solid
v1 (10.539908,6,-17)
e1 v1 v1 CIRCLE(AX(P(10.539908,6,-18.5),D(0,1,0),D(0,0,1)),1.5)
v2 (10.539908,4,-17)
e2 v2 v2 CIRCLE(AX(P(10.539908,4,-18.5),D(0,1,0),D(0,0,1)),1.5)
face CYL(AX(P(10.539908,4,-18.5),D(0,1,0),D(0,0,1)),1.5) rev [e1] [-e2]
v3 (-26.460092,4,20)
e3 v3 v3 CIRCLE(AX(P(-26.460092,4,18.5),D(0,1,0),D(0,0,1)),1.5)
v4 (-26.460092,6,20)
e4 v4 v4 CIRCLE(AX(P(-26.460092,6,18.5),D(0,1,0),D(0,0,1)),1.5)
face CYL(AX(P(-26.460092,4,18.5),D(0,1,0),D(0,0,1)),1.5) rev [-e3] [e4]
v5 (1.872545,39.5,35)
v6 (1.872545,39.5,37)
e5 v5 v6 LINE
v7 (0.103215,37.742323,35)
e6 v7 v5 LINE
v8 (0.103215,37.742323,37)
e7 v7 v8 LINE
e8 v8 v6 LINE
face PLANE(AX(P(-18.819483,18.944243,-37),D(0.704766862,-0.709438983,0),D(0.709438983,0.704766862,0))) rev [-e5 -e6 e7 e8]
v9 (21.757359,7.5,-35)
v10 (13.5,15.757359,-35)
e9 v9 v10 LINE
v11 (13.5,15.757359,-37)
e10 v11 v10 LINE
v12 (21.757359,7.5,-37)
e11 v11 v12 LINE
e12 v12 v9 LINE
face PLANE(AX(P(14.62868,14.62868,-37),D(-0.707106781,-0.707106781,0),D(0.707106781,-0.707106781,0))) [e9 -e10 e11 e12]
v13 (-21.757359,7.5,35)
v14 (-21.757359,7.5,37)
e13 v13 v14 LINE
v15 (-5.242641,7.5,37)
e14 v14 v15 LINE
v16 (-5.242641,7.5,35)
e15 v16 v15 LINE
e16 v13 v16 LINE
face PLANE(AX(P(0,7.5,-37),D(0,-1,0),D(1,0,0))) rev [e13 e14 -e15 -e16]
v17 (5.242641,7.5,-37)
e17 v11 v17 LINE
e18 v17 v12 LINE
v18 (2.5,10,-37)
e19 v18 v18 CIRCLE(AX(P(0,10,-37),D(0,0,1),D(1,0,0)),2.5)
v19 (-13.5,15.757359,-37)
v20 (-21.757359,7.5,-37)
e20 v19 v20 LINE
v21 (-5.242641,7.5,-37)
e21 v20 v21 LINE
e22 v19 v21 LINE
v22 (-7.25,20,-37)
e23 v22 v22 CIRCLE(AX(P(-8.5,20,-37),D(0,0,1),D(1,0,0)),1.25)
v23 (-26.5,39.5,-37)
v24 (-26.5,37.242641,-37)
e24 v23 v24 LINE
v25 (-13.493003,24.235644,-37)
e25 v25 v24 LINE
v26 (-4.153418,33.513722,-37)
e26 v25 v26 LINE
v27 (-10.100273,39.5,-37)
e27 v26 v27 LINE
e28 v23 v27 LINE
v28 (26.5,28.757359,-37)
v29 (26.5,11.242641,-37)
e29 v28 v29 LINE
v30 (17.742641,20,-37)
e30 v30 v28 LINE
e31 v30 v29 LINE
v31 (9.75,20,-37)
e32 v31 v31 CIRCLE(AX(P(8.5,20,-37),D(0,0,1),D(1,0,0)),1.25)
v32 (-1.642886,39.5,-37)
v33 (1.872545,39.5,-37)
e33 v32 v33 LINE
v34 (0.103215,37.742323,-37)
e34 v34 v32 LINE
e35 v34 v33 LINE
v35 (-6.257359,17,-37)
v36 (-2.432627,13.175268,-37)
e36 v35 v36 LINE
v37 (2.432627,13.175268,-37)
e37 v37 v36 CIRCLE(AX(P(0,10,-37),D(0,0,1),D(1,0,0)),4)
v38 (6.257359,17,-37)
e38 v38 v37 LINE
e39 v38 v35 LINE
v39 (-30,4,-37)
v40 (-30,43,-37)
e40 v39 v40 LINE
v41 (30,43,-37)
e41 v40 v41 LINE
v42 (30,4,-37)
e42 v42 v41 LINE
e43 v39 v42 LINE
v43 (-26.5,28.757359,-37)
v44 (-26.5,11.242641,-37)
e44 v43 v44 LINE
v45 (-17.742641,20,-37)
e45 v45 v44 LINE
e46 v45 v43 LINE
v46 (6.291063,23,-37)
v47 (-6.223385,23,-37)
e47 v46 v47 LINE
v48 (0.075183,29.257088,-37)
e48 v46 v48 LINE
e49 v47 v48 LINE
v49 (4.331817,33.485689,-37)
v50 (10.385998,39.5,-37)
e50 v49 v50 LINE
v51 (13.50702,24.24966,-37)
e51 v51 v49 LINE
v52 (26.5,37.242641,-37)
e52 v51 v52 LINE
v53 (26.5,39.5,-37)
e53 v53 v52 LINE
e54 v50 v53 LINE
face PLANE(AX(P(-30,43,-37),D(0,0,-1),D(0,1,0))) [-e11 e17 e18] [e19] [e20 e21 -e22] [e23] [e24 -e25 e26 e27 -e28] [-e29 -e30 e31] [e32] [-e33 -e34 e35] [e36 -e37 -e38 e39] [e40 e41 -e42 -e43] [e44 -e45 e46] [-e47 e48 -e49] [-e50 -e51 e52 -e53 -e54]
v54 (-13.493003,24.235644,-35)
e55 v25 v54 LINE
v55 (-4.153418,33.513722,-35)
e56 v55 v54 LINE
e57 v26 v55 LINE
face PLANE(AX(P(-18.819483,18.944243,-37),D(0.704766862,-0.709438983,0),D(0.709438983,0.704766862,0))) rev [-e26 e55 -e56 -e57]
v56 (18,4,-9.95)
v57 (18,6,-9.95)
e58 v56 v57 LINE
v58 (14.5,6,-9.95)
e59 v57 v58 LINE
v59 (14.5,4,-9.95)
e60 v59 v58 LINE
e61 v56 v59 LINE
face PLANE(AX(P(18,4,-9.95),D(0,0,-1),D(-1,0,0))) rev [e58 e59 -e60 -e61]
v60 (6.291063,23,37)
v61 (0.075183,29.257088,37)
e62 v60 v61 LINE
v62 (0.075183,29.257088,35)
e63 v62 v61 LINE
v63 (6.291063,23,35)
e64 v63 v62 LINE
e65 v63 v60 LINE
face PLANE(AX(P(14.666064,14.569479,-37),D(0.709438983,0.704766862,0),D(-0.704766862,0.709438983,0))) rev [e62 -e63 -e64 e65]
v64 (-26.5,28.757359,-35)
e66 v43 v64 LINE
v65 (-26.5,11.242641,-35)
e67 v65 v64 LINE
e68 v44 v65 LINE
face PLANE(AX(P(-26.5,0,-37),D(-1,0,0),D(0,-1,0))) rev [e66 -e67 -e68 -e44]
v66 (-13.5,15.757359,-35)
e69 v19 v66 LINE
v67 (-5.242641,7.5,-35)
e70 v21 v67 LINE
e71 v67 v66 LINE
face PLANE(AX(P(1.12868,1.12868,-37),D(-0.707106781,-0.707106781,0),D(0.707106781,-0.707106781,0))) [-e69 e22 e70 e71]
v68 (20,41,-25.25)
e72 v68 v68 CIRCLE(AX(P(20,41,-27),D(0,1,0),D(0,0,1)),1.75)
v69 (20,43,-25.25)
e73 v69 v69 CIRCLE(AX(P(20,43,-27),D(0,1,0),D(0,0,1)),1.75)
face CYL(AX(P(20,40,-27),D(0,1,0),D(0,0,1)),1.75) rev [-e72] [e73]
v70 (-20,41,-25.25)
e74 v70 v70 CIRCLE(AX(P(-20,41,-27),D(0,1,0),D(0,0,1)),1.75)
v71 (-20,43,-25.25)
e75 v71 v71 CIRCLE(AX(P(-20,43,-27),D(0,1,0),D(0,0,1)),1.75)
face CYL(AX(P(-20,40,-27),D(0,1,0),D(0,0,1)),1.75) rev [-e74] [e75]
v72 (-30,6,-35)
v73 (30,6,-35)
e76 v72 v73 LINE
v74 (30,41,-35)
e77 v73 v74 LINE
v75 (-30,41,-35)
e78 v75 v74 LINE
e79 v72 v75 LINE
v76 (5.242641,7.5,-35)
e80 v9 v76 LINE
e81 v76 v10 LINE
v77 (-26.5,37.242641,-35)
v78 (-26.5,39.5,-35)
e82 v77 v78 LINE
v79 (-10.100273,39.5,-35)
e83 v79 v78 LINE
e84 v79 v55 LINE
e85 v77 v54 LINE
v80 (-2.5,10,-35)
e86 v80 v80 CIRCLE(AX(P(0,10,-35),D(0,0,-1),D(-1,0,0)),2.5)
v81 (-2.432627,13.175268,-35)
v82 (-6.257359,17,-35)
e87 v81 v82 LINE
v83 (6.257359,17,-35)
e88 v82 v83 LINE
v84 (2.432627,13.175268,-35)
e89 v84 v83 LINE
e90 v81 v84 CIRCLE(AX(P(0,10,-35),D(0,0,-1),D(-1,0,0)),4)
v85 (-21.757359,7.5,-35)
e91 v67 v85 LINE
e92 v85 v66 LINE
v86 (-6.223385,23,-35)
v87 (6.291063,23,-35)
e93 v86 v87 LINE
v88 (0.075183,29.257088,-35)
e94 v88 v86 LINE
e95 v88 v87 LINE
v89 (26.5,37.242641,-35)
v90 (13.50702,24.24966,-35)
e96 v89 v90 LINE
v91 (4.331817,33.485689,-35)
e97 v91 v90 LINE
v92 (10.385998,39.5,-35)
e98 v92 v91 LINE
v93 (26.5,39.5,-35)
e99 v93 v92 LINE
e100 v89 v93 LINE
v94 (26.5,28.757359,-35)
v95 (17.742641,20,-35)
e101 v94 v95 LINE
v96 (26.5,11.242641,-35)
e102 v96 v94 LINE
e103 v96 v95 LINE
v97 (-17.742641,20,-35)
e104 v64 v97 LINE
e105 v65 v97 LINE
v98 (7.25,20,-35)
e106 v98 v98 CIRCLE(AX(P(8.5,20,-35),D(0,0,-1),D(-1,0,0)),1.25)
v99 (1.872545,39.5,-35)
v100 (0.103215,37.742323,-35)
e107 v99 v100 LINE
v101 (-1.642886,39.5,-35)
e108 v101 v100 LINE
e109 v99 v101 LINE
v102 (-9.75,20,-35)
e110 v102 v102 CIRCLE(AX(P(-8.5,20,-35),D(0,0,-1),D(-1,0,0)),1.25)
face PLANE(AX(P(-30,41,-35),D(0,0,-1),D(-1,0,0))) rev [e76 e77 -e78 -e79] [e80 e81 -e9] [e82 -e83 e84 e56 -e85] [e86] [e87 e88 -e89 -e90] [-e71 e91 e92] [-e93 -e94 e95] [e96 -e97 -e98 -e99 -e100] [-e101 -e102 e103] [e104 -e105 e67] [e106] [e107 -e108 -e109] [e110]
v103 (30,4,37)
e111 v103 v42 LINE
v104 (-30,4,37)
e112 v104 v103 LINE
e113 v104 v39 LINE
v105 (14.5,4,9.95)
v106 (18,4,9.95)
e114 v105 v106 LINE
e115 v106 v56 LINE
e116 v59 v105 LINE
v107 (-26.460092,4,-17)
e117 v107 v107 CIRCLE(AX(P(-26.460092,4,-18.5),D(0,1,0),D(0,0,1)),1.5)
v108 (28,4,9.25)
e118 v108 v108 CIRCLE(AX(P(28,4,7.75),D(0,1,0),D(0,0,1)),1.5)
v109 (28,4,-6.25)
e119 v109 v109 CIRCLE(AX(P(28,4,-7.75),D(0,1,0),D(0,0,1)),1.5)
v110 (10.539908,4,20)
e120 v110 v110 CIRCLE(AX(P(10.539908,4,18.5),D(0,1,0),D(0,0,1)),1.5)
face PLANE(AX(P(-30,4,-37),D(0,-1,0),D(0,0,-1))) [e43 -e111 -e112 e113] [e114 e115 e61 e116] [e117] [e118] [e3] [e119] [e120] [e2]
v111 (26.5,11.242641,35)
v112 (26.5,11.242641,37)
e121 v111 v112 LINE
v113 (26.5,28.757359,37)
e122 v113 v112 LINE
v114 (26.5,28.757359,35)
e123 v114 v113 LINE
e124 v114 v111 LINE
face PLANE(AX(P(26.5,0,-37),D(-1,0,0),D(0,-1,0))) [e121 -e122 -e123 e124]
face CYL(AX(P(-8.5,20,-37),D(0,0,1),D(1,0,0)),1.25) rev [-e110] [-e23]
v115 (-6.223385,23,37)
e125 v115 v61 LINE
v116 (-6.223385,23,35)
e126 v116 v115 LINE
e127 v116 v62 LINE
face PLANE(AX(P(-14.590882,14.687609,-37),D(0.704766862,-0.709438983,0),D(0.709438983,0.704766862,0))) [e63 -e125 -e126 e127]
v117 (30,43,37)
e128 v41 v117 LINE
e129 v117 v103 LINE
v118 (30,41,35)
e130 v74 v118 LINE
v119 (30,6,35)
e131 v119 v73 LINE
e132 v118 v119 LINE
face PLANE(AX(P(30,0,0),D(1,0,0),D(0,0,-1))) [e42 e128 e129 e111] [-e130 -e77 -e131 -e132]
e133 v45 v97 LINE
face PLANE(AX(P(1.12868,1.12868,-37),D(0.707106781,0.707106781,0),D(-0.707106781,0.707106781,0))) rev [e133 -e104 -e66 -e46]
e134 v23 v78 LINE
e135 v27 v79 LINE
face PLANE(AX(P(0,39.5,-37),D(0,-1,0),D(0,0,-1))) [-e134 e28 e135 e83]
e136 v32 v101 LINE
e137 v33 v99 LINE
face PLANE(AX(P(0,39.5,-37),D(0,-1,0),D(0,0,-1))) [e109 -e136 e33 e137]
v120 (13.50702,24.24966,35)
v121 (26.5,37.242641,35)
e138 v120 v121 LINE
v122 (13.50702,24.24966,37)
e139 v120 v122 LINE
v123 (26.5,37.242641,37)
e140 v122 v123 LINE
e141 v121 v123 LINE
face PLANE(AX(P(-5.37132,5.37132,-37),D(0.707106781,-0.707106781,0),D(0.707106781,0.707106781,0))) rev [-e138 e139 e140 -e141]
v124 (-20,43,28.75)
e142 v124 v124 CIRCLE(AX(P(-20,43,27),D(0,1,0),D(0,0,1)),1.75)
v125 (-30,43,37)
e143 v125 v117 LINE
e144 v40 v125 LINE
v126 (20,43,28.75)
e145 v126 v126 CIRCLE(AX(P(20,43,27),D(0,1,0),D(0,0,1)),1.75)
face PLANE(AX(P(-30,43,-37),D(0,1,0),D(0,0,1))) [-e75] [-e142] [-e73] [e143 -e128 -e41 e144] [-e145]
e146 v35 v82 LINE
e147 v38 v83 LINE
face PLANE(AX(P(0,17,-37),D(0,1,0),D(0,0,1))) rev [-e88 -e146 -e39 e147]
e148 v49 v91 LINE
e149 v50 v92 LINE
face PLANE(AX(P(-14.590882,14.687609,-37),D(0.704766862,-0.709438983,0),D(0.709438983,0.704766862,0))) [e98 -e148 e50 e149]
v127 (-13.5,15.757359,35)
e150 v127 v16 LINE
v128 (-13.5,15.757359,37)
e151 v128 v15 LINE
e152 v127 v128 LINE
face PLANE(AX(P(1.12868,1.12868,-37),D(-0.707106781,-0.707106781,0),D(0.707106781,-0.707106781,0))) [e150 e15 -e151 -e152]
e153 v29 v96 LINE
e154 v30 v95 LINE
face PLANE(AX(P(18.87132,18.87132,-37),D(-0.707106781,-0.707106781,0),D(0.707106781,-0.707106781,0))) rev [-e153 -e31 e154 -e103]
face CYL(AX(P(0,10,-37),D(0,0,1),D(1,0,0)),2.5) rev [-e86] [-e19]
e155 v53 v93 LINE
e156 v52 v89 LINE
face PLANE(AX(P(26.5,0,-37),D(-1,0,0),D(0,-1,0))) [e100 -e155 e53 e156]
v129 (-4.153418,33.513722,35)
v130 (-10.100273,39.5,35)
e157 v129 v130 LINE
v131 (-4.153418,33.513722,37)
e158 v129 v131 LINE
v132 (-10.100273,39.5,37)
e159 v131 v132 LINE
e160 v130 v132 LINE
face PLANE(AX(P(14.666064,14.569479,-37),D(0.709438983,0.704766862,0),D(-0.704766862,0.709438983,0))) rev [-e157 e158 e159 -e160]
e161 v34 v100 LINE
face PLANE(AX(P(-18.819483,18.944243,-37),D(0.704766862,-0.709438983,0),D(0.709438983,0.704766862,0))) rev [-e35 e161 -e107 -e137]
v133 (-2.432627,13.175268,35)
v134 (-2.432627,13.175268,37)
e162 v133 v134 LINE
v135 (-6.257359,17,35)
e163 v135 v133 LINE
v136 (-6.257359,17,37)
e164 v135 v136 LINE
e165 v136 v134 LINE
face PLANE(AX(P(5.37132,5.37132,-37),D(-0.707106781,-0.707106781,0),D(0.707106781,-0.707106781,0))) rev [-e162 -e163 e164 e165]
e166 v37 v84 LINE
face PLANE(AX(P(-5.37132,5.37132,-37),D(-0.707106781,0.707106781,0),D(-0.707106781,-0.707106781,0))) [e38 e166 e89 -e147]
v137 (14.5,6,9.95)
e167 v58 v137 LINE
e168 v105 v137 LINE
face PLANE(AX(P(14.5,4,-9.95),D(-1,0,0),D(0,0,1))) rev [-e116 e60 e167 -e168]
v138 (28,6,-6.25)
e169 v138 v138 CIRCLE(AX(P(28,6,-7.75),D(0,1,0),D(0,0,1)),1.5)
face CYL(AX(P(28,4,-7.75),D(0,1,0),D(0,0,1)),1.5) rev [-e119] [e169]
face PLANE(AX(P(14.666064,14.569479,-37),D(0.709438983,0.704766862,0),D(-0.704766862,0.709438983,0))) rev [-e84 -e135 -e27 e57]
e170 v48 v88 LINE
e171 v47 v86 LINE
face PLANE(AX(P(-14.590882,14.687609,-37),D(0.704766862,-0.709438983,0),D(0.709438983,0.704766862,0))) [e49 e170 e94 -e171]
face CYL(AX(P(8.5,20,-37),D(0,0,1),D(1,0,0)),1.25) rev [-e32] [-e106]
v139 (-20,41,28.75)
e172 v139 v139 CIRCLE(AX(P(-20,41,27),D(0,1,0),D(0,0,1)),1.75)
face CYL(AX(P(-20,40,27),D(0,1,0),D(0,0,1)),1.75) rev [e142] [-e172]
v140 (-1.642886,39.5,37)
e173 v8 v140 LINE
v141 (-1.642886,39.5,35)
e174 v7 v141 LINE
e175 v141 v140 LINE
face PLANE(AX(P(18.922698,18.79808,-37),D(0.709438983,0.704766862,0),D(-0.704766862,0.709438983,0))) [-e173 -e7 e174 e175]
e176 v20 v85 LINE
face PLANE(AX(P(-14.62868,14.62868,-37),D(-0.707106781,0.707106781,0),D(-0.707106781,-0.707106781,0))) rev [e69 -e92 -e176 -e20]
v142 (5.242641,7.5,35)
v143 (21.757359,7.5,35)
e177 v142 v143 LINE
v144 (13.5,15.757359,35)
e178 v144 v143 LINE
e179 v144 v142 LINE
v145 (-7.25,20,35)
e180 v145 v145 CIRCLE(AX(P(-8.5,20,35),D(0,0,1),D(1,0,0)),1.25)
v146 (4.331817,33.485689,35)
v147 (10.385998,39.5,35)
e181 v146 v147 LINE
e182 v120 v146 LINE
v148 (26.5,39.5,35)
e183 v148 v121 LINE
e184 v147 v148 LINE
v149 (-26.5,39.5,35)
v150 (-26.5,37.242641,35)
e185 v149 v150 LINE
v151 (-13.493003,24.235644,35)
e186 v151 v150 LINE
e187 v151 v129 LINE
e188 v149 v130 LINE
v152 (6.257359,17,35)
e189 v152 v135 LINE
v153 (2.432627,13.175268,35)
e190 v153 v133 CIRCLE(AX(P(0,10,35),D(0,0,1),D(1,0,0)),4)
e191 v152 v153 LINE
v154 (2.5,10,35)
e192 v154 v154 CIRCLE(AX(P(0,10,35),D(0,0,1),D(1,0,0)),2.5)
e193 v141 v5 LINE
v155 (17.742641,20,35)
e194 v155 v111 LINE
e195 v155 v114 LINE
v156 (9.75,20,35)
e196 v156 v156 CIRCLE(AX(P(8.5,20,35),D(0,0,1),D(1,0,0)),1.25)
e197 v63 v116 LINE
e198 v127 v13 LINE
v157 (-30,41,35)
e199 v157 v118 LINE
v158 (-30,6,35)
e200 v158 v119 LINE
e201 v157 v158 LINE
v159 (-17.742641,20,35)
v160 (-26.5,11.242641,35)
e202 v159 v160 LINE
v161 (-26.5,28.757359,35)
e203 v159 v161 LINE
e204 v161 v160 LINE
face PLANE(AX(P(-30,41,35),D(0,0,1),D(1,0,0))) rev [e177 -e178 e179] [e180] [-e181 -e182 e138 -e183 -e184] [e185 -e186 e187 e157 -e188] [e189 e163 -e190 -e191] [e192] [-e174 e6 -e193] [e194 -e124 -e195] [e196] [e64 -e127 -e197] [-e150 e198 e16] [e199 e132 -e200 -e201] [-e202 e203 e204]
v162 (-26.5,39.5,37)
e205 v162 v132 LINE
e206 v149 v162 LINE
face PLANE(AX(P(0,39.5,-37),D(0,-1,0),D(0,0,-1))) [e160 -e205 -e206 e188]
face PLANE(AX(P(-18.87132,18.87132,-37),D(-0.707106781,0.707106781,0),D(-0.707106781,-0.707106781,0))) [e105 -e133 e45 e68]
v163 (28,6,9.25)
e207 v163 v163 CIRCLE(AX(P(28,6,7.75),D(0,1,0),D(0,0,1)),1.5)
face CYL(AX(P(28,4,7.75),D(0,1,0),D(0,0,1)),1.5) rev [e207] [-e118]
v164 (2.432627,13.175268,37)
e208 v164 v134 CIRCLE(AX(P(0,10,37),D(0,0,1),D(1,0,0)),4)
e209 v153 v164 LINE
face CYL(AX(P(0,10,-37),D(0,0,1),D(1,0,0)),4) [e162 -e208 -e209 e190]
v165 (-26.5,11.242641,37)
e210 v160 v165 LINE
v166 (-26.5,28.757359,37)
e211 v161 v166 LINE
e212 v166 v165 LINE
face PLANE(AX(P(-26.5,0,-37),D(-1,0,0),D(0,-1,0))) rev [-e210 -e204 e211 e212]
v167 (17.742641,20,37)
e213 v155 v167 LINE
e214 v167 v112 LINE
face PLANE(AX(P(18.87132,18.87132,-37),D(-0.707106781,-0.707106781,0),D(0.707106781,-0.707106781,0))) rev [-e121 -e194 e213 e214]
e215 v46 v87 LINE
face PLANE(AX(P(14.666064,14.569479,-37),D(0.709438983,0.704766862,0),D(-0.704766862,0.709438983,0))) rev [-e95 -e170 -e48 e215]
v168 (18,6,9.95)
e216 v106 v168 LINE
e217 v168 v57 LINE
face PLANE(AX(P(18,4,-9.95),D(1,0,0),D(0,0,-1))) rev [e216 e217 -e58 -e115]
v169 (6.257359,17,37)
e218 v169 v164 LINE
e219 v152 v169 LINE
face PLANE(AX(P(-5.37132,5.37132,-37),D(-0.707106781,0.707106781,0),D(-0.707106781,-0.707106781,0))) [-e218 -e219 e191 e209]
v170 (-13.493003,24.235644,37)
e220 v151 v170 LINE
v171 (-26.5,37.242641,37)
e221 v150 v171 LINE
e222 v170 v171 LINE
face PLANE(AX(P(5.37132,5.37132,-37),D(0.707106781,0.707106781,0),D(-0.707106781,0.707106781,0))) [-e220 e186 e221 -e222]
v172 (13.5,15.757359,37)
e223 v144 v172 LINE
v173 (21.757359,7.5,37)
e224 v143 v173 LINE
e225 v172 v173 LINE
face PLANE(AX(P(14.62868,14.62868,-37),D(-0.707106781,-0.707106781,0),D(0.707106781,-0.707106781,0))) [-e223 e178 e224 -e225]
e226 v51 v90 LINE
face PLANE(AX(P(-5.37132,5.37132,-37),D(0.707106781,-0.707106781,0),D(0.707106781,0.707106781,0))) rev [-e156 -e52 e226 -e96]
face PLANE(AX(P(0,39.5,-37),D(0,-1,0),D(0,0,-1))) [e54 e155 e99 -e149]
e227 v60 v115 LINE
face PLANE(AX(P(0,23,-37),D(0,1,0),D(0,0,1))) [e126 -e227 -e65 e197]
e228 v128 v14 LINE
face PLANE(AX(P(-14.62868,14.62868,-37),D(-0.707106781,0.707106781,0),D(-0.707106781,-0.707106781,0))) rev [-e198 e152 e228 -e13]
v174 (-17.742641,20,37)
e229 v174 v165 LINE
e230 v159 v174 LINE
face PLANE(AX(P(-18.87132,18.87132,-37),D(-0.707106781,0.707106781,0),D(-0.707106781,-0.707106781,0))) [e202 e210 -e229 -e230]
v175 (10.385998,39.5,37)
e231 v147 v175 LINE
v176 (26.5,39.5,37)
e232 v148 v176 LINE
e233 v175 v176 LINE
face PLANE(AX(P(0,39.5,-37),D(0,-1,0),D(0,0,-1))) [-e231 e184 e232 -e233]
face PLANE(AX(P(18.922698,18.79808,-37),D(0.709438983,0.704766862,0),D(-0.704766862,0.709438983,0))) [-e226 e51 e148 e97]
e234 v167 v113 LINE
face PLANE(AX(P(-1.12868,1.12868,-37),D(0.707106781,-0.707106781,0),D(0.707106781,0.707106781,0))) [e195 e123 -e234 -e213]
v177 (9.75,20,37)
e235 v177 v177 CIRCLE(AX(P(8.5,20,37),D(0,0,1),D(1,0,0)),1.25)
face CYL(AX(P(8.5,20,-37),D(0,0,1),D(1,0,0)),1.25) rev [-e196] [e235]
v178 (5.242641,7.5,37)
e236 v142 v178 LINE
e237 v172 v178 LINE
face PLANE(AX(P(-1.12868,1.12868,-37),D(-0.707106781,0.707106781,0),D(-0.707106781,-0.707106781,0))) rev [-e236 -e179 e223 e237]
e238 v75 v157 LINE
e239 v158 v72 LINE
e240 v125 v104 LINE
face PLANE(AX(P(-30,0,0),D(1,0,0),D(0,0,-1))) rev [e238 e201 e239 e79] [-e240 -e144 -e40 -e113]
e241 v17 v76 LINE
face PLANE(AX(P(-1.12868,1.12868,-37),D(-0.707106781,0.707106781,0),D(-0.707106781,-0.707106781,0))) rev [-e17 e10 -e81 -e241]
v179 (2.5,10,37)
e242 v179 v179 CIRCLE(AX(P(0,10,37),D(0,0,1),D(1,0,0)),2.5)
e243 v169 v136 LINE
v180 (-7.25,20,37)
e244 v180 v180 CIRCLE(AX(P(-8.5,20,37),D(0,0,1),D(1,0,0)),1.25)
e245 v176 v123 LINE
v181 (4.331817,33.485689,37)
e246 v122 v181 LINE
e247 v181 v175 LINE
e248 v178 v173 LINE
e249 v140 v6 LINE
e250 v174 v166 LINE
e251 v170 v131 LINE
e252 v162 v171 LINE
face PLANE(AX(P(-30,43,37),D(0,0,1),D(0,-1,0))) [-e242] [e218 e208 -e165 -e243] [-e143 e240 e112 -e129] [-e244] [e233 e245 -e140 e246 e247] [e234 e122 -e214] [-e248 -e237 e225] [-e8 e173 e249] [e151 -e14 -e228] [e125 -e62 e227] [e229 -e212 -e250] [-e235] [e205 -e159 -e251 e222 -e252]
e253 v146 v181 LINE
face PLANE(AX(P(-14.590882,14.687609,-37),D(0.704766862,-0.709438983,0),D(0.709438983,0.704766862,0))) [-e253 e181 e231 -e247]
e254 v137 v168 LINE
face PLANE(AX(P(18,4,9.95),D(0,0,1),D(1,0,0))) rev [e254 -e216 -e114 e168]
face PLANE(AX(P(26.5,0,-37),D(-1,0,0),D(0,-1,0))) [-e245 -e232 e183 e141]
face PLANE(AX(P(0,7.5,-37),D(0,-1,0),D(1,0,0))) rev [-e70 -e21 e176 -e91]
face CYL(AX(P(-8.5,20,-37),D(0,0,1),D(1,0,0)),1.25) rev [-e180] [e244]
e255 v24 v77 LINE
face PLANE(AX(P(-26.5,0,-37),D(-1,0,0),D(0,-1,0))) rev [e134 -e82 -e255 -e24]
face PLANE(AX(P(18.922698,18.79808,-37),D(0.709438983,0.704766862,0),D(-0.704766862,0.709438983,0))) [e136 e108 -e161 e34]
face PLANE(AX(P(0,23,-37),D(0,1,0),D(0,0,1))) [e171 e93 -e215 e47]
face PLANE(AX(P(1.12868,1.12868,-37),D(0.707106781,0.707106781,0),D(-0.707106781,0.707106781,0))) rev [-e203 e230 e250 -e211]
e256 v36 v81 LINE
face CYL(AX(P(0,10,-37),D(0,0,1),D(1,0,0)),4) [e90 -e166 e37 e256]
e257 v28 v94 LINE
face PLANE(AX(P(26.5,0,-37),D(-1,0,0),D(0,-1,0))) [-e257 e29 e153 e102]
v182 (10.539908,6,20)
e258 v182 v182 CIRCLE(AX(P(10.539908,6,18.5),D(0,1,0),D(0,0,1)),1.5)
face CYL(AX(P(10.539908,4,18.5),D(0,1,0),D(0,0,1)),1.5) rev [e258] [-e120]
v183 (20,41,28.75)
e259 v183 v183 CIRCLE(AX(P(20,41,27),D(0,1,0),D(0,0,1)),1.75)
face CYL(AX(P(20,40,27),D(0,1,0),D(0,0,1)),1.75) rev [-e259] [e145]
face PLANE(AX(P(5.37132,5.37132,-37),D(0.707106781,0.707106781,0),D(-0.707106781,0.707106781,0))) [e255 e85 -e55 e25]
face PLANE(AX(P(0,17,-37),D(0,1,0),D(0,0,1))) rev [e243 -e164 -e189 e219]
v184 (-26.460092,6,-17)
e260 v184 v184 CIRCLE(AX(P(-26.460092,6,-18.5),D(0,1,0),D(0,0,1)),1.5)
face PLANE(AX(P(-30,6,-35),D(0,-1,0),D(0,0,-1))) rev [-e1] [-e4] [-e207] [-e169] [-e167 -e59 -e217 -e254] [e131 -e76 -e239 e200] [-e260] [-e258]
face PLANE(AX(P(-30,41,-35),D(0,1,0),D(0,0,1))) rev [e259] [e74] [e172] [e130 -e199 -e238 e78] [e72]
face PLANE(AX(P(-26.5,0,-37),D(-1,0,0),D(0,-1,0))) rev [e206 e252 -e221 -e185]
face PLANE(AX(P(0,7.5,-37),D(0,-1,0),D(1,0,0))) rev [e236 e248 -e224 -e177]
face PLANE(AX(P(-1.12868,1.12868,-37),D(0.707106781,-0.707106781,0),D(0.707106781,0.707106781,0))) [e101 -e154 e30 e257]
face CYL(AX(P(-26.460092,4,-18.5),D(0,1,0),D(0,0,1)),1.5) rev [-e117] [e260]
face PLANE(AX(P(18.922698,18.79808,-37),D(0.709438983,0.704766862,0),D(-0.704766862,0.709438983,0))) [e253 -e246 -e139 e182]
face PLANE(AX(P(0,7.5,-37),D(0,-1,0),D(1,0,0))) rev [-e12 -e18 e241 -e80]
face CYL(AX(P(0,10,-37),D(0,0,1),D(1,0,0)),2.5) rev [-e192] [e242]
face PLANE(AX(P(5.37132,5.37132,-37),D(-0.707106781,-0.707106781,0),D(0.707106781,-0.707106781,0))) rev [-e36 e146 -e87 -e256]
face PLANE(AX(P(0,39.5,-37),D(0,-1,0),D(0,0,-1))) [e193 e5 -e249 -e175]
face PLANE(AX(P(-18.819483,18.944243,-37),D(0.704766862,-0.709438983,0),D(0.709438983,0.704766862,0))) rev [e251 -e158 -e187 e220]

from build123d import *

# Parameters (mm, degrees)
BOSS_EXTRUDE1_DEPTH      = 30
BOSS_EXTRUDE1_DEPTH_BACK = 30
SKETCH2_W                = 74
SKETCH2_H                = 39
SKETCH2_W_2              = 70
SKETCH2_H_2              = 35
CUT_EXTRUDE1_DEPTH       = 65.171644829
CUT_EXTRUDE1_DEPTH_BACK  = 65.171644829
SKETCH1_R                = 1.25
SKETCH1_R_2              = 2.5
CUT_EXTRUDE2_START       = -37
CUT_EXTRUDE2_DEPTH       = 74
SKETCH4_R                = 1.75
CUT_EXTRUDE3_DEPTH       = 3
SKETCH5_R                = 1.5
SKETCH5_W                = 3.5
SKETCH5_H                = 19.9
CUT_EXTRUDE4_DEPTH       = 61.3158354


# Read off the part's stored shape, not the designer's step: Cut-Extrude2
with BuildPart() as part:
    # Sketch2 → Boss-Extrude1 (new, two sides: drawn at the far end of the back side and taken through both)
    with BuildSketch(Plane(origin=(0, 0, 0), x_dir=(0, 0, -1), z_dir=(1, 0, 0)).offset(-BOSS_EXTRUDE1_DEPTH_BACK)):
        with Locations((0, 23.5)):
            Rectangle(SKETCH2_W, SKETCH2_H)
        with Locations((0, 23.5)):
            Rectangle(SKETCH2_W_2, SKETCH2_H_2, mode=Mode.SUBTRACT)
    extrude(amount=BOSS_EXTRUDE1_DEPTH + BOSS_EXTRUDE1_DEPTH_BACK)

    # Sketch1 → Cut-Extrude1 (cut, two sides: drawn at the far end of the back side and taken through both)
    with BuildSketch(Plane.XY.offset(-CUT_EXTRUDE1_DEPTH_BACK)):
        with Locations((8.5, 20)):
            Circle(SKETCH1_R)
        with Locations((-8.5, 20)):
            Circle(SKETCH1_R)
        with Locations((0, 10)):
            Circle(SKETCH1_R_2)
    extrude(amount=CUT_EXTRUDE1_DEPTH + CUT_EXTRUDE1_DEPTH_BACK, mode=Mode.SUBTRACT)

    # Cut-Extrude2 outline → Cut-Extrude2 (cut)
    with BuildSketch(Plane.XY.offset(CUT_EXTRUDE2_START)):
        Polygon((-6.223385238, 23), (6.291063493, 23), (0.075182746, 29.257087778), align=None)
        Polygon((-13.493003356, 24.235644043), (-4.153418424, 33.513721677), (-10.100273174, 39.5), (-26.5, 39.5), (-26.5, 37.242640687), align=None)
        Polygon((10.385998459, 39.5), (4.331816644, 33.485688948), (13.507019797, 24.249660484), (26.5, 37.242640687), (26.5, 39.5), align=None)
        Polygon((21.757359313, 7.5), (13.5, 15.757359313), (5.242640687, 7.5), align=None)
        Polygon((26.5, 28.757359313), (17.742640687, 20), (26.5, 11.242640687), align=None)
        Polygon((-13.5, 15.757359313), (-21.757359313, 7.5), (-5.242640687, 7.5), align=None)
        with BuildLine():
            Line((2.432627089, 13.175267776), (6.257359313, 17))
            Line((6.257359313, 17), (-6.257359313, 17))
            Line((-6.257359313, 17), (-2.432627089, 13.175267776))
            ThreePointArc((-2.432627089, 13.175267776), (0, 14), (2.432627089, 13.175267776))
        make_face()
        Polygon((-26.5, 11.242640687), (-17.742640687, 20), (-26.5, 28.757359313), align=None)
        Polygon((1.872544824, 39.5), (-1.642886221, 39.5), (0.103215475, 37.742322846), align=None)
    extrude(amount=CUT_EXTRUDE2_DEPTH, mode=Mode.SUBTRACT)

    # Sketch4 → Cut-Extrude3 (cut)
    with BuildSketch(Plane(origin=(0, 43, 0), x_dir=(1, 0, 0), z_dir=(0, 1, 0))):
        with Locations(Location((-20, 27, 0), (0, 0, 270))):
            Circle(SKETCH4_R)
        with Locations(Location((20, 27, 0), (0, 0, 270))):
            Circle(SKETCH4_R)
        with Locations(Location((20, -27, 0), (0, 0, 270))):
            Circle(SKETCH4_R)
        with Locations(Location((-20, -27, 0), (0, 0, 270))):
            Circle(SKETCH4_R)
    extrude(amount=-CUT_EXTRUDE3_DEPTH, mode=Mode.SUBTRACT)

    # Sketch5 → Cut-Extrude4 (cut, through all)
    with BuildSketch(Plane(origin=(0, 6, 0), x_dir=(1, 0, 0), z_dir=(0, 1, 0))):
        with Locations(Location((-26.460092097, -18.5, 0), (0, 0, 270))):
            Circle(SKETCH5_R)
        with Locations(Location((-26.460092097, 18.5, 0), (0, 0, 270))):
            Circle(SKETCH5_R)
        with Locations(Location((10.539907903, 18.5, 0), (0, 0, 270))):
            Circle(SKETCH5_R)
        with Locations(Location((10.539907903, -18.5, 0), (0, 0, 270))):
            Circle(SKETCH5_R)
        with Locations(Location((28, -7.75, 0), (0, 0, 270))):
            Circle(SKETCH5_R)
        with Locations(Location((28, 7.75, 0), (0, 0, 270))):
            Circle(SKETCH5_R)
        with Locations((16.25, 0)):
            Rectangle(SKETCH5_W, SKETCH5_H)
    extrude(amount=-CUT_EXTRUDE4_DEPTH, mode=Mode.SUBTRACT)


solid = part.part
